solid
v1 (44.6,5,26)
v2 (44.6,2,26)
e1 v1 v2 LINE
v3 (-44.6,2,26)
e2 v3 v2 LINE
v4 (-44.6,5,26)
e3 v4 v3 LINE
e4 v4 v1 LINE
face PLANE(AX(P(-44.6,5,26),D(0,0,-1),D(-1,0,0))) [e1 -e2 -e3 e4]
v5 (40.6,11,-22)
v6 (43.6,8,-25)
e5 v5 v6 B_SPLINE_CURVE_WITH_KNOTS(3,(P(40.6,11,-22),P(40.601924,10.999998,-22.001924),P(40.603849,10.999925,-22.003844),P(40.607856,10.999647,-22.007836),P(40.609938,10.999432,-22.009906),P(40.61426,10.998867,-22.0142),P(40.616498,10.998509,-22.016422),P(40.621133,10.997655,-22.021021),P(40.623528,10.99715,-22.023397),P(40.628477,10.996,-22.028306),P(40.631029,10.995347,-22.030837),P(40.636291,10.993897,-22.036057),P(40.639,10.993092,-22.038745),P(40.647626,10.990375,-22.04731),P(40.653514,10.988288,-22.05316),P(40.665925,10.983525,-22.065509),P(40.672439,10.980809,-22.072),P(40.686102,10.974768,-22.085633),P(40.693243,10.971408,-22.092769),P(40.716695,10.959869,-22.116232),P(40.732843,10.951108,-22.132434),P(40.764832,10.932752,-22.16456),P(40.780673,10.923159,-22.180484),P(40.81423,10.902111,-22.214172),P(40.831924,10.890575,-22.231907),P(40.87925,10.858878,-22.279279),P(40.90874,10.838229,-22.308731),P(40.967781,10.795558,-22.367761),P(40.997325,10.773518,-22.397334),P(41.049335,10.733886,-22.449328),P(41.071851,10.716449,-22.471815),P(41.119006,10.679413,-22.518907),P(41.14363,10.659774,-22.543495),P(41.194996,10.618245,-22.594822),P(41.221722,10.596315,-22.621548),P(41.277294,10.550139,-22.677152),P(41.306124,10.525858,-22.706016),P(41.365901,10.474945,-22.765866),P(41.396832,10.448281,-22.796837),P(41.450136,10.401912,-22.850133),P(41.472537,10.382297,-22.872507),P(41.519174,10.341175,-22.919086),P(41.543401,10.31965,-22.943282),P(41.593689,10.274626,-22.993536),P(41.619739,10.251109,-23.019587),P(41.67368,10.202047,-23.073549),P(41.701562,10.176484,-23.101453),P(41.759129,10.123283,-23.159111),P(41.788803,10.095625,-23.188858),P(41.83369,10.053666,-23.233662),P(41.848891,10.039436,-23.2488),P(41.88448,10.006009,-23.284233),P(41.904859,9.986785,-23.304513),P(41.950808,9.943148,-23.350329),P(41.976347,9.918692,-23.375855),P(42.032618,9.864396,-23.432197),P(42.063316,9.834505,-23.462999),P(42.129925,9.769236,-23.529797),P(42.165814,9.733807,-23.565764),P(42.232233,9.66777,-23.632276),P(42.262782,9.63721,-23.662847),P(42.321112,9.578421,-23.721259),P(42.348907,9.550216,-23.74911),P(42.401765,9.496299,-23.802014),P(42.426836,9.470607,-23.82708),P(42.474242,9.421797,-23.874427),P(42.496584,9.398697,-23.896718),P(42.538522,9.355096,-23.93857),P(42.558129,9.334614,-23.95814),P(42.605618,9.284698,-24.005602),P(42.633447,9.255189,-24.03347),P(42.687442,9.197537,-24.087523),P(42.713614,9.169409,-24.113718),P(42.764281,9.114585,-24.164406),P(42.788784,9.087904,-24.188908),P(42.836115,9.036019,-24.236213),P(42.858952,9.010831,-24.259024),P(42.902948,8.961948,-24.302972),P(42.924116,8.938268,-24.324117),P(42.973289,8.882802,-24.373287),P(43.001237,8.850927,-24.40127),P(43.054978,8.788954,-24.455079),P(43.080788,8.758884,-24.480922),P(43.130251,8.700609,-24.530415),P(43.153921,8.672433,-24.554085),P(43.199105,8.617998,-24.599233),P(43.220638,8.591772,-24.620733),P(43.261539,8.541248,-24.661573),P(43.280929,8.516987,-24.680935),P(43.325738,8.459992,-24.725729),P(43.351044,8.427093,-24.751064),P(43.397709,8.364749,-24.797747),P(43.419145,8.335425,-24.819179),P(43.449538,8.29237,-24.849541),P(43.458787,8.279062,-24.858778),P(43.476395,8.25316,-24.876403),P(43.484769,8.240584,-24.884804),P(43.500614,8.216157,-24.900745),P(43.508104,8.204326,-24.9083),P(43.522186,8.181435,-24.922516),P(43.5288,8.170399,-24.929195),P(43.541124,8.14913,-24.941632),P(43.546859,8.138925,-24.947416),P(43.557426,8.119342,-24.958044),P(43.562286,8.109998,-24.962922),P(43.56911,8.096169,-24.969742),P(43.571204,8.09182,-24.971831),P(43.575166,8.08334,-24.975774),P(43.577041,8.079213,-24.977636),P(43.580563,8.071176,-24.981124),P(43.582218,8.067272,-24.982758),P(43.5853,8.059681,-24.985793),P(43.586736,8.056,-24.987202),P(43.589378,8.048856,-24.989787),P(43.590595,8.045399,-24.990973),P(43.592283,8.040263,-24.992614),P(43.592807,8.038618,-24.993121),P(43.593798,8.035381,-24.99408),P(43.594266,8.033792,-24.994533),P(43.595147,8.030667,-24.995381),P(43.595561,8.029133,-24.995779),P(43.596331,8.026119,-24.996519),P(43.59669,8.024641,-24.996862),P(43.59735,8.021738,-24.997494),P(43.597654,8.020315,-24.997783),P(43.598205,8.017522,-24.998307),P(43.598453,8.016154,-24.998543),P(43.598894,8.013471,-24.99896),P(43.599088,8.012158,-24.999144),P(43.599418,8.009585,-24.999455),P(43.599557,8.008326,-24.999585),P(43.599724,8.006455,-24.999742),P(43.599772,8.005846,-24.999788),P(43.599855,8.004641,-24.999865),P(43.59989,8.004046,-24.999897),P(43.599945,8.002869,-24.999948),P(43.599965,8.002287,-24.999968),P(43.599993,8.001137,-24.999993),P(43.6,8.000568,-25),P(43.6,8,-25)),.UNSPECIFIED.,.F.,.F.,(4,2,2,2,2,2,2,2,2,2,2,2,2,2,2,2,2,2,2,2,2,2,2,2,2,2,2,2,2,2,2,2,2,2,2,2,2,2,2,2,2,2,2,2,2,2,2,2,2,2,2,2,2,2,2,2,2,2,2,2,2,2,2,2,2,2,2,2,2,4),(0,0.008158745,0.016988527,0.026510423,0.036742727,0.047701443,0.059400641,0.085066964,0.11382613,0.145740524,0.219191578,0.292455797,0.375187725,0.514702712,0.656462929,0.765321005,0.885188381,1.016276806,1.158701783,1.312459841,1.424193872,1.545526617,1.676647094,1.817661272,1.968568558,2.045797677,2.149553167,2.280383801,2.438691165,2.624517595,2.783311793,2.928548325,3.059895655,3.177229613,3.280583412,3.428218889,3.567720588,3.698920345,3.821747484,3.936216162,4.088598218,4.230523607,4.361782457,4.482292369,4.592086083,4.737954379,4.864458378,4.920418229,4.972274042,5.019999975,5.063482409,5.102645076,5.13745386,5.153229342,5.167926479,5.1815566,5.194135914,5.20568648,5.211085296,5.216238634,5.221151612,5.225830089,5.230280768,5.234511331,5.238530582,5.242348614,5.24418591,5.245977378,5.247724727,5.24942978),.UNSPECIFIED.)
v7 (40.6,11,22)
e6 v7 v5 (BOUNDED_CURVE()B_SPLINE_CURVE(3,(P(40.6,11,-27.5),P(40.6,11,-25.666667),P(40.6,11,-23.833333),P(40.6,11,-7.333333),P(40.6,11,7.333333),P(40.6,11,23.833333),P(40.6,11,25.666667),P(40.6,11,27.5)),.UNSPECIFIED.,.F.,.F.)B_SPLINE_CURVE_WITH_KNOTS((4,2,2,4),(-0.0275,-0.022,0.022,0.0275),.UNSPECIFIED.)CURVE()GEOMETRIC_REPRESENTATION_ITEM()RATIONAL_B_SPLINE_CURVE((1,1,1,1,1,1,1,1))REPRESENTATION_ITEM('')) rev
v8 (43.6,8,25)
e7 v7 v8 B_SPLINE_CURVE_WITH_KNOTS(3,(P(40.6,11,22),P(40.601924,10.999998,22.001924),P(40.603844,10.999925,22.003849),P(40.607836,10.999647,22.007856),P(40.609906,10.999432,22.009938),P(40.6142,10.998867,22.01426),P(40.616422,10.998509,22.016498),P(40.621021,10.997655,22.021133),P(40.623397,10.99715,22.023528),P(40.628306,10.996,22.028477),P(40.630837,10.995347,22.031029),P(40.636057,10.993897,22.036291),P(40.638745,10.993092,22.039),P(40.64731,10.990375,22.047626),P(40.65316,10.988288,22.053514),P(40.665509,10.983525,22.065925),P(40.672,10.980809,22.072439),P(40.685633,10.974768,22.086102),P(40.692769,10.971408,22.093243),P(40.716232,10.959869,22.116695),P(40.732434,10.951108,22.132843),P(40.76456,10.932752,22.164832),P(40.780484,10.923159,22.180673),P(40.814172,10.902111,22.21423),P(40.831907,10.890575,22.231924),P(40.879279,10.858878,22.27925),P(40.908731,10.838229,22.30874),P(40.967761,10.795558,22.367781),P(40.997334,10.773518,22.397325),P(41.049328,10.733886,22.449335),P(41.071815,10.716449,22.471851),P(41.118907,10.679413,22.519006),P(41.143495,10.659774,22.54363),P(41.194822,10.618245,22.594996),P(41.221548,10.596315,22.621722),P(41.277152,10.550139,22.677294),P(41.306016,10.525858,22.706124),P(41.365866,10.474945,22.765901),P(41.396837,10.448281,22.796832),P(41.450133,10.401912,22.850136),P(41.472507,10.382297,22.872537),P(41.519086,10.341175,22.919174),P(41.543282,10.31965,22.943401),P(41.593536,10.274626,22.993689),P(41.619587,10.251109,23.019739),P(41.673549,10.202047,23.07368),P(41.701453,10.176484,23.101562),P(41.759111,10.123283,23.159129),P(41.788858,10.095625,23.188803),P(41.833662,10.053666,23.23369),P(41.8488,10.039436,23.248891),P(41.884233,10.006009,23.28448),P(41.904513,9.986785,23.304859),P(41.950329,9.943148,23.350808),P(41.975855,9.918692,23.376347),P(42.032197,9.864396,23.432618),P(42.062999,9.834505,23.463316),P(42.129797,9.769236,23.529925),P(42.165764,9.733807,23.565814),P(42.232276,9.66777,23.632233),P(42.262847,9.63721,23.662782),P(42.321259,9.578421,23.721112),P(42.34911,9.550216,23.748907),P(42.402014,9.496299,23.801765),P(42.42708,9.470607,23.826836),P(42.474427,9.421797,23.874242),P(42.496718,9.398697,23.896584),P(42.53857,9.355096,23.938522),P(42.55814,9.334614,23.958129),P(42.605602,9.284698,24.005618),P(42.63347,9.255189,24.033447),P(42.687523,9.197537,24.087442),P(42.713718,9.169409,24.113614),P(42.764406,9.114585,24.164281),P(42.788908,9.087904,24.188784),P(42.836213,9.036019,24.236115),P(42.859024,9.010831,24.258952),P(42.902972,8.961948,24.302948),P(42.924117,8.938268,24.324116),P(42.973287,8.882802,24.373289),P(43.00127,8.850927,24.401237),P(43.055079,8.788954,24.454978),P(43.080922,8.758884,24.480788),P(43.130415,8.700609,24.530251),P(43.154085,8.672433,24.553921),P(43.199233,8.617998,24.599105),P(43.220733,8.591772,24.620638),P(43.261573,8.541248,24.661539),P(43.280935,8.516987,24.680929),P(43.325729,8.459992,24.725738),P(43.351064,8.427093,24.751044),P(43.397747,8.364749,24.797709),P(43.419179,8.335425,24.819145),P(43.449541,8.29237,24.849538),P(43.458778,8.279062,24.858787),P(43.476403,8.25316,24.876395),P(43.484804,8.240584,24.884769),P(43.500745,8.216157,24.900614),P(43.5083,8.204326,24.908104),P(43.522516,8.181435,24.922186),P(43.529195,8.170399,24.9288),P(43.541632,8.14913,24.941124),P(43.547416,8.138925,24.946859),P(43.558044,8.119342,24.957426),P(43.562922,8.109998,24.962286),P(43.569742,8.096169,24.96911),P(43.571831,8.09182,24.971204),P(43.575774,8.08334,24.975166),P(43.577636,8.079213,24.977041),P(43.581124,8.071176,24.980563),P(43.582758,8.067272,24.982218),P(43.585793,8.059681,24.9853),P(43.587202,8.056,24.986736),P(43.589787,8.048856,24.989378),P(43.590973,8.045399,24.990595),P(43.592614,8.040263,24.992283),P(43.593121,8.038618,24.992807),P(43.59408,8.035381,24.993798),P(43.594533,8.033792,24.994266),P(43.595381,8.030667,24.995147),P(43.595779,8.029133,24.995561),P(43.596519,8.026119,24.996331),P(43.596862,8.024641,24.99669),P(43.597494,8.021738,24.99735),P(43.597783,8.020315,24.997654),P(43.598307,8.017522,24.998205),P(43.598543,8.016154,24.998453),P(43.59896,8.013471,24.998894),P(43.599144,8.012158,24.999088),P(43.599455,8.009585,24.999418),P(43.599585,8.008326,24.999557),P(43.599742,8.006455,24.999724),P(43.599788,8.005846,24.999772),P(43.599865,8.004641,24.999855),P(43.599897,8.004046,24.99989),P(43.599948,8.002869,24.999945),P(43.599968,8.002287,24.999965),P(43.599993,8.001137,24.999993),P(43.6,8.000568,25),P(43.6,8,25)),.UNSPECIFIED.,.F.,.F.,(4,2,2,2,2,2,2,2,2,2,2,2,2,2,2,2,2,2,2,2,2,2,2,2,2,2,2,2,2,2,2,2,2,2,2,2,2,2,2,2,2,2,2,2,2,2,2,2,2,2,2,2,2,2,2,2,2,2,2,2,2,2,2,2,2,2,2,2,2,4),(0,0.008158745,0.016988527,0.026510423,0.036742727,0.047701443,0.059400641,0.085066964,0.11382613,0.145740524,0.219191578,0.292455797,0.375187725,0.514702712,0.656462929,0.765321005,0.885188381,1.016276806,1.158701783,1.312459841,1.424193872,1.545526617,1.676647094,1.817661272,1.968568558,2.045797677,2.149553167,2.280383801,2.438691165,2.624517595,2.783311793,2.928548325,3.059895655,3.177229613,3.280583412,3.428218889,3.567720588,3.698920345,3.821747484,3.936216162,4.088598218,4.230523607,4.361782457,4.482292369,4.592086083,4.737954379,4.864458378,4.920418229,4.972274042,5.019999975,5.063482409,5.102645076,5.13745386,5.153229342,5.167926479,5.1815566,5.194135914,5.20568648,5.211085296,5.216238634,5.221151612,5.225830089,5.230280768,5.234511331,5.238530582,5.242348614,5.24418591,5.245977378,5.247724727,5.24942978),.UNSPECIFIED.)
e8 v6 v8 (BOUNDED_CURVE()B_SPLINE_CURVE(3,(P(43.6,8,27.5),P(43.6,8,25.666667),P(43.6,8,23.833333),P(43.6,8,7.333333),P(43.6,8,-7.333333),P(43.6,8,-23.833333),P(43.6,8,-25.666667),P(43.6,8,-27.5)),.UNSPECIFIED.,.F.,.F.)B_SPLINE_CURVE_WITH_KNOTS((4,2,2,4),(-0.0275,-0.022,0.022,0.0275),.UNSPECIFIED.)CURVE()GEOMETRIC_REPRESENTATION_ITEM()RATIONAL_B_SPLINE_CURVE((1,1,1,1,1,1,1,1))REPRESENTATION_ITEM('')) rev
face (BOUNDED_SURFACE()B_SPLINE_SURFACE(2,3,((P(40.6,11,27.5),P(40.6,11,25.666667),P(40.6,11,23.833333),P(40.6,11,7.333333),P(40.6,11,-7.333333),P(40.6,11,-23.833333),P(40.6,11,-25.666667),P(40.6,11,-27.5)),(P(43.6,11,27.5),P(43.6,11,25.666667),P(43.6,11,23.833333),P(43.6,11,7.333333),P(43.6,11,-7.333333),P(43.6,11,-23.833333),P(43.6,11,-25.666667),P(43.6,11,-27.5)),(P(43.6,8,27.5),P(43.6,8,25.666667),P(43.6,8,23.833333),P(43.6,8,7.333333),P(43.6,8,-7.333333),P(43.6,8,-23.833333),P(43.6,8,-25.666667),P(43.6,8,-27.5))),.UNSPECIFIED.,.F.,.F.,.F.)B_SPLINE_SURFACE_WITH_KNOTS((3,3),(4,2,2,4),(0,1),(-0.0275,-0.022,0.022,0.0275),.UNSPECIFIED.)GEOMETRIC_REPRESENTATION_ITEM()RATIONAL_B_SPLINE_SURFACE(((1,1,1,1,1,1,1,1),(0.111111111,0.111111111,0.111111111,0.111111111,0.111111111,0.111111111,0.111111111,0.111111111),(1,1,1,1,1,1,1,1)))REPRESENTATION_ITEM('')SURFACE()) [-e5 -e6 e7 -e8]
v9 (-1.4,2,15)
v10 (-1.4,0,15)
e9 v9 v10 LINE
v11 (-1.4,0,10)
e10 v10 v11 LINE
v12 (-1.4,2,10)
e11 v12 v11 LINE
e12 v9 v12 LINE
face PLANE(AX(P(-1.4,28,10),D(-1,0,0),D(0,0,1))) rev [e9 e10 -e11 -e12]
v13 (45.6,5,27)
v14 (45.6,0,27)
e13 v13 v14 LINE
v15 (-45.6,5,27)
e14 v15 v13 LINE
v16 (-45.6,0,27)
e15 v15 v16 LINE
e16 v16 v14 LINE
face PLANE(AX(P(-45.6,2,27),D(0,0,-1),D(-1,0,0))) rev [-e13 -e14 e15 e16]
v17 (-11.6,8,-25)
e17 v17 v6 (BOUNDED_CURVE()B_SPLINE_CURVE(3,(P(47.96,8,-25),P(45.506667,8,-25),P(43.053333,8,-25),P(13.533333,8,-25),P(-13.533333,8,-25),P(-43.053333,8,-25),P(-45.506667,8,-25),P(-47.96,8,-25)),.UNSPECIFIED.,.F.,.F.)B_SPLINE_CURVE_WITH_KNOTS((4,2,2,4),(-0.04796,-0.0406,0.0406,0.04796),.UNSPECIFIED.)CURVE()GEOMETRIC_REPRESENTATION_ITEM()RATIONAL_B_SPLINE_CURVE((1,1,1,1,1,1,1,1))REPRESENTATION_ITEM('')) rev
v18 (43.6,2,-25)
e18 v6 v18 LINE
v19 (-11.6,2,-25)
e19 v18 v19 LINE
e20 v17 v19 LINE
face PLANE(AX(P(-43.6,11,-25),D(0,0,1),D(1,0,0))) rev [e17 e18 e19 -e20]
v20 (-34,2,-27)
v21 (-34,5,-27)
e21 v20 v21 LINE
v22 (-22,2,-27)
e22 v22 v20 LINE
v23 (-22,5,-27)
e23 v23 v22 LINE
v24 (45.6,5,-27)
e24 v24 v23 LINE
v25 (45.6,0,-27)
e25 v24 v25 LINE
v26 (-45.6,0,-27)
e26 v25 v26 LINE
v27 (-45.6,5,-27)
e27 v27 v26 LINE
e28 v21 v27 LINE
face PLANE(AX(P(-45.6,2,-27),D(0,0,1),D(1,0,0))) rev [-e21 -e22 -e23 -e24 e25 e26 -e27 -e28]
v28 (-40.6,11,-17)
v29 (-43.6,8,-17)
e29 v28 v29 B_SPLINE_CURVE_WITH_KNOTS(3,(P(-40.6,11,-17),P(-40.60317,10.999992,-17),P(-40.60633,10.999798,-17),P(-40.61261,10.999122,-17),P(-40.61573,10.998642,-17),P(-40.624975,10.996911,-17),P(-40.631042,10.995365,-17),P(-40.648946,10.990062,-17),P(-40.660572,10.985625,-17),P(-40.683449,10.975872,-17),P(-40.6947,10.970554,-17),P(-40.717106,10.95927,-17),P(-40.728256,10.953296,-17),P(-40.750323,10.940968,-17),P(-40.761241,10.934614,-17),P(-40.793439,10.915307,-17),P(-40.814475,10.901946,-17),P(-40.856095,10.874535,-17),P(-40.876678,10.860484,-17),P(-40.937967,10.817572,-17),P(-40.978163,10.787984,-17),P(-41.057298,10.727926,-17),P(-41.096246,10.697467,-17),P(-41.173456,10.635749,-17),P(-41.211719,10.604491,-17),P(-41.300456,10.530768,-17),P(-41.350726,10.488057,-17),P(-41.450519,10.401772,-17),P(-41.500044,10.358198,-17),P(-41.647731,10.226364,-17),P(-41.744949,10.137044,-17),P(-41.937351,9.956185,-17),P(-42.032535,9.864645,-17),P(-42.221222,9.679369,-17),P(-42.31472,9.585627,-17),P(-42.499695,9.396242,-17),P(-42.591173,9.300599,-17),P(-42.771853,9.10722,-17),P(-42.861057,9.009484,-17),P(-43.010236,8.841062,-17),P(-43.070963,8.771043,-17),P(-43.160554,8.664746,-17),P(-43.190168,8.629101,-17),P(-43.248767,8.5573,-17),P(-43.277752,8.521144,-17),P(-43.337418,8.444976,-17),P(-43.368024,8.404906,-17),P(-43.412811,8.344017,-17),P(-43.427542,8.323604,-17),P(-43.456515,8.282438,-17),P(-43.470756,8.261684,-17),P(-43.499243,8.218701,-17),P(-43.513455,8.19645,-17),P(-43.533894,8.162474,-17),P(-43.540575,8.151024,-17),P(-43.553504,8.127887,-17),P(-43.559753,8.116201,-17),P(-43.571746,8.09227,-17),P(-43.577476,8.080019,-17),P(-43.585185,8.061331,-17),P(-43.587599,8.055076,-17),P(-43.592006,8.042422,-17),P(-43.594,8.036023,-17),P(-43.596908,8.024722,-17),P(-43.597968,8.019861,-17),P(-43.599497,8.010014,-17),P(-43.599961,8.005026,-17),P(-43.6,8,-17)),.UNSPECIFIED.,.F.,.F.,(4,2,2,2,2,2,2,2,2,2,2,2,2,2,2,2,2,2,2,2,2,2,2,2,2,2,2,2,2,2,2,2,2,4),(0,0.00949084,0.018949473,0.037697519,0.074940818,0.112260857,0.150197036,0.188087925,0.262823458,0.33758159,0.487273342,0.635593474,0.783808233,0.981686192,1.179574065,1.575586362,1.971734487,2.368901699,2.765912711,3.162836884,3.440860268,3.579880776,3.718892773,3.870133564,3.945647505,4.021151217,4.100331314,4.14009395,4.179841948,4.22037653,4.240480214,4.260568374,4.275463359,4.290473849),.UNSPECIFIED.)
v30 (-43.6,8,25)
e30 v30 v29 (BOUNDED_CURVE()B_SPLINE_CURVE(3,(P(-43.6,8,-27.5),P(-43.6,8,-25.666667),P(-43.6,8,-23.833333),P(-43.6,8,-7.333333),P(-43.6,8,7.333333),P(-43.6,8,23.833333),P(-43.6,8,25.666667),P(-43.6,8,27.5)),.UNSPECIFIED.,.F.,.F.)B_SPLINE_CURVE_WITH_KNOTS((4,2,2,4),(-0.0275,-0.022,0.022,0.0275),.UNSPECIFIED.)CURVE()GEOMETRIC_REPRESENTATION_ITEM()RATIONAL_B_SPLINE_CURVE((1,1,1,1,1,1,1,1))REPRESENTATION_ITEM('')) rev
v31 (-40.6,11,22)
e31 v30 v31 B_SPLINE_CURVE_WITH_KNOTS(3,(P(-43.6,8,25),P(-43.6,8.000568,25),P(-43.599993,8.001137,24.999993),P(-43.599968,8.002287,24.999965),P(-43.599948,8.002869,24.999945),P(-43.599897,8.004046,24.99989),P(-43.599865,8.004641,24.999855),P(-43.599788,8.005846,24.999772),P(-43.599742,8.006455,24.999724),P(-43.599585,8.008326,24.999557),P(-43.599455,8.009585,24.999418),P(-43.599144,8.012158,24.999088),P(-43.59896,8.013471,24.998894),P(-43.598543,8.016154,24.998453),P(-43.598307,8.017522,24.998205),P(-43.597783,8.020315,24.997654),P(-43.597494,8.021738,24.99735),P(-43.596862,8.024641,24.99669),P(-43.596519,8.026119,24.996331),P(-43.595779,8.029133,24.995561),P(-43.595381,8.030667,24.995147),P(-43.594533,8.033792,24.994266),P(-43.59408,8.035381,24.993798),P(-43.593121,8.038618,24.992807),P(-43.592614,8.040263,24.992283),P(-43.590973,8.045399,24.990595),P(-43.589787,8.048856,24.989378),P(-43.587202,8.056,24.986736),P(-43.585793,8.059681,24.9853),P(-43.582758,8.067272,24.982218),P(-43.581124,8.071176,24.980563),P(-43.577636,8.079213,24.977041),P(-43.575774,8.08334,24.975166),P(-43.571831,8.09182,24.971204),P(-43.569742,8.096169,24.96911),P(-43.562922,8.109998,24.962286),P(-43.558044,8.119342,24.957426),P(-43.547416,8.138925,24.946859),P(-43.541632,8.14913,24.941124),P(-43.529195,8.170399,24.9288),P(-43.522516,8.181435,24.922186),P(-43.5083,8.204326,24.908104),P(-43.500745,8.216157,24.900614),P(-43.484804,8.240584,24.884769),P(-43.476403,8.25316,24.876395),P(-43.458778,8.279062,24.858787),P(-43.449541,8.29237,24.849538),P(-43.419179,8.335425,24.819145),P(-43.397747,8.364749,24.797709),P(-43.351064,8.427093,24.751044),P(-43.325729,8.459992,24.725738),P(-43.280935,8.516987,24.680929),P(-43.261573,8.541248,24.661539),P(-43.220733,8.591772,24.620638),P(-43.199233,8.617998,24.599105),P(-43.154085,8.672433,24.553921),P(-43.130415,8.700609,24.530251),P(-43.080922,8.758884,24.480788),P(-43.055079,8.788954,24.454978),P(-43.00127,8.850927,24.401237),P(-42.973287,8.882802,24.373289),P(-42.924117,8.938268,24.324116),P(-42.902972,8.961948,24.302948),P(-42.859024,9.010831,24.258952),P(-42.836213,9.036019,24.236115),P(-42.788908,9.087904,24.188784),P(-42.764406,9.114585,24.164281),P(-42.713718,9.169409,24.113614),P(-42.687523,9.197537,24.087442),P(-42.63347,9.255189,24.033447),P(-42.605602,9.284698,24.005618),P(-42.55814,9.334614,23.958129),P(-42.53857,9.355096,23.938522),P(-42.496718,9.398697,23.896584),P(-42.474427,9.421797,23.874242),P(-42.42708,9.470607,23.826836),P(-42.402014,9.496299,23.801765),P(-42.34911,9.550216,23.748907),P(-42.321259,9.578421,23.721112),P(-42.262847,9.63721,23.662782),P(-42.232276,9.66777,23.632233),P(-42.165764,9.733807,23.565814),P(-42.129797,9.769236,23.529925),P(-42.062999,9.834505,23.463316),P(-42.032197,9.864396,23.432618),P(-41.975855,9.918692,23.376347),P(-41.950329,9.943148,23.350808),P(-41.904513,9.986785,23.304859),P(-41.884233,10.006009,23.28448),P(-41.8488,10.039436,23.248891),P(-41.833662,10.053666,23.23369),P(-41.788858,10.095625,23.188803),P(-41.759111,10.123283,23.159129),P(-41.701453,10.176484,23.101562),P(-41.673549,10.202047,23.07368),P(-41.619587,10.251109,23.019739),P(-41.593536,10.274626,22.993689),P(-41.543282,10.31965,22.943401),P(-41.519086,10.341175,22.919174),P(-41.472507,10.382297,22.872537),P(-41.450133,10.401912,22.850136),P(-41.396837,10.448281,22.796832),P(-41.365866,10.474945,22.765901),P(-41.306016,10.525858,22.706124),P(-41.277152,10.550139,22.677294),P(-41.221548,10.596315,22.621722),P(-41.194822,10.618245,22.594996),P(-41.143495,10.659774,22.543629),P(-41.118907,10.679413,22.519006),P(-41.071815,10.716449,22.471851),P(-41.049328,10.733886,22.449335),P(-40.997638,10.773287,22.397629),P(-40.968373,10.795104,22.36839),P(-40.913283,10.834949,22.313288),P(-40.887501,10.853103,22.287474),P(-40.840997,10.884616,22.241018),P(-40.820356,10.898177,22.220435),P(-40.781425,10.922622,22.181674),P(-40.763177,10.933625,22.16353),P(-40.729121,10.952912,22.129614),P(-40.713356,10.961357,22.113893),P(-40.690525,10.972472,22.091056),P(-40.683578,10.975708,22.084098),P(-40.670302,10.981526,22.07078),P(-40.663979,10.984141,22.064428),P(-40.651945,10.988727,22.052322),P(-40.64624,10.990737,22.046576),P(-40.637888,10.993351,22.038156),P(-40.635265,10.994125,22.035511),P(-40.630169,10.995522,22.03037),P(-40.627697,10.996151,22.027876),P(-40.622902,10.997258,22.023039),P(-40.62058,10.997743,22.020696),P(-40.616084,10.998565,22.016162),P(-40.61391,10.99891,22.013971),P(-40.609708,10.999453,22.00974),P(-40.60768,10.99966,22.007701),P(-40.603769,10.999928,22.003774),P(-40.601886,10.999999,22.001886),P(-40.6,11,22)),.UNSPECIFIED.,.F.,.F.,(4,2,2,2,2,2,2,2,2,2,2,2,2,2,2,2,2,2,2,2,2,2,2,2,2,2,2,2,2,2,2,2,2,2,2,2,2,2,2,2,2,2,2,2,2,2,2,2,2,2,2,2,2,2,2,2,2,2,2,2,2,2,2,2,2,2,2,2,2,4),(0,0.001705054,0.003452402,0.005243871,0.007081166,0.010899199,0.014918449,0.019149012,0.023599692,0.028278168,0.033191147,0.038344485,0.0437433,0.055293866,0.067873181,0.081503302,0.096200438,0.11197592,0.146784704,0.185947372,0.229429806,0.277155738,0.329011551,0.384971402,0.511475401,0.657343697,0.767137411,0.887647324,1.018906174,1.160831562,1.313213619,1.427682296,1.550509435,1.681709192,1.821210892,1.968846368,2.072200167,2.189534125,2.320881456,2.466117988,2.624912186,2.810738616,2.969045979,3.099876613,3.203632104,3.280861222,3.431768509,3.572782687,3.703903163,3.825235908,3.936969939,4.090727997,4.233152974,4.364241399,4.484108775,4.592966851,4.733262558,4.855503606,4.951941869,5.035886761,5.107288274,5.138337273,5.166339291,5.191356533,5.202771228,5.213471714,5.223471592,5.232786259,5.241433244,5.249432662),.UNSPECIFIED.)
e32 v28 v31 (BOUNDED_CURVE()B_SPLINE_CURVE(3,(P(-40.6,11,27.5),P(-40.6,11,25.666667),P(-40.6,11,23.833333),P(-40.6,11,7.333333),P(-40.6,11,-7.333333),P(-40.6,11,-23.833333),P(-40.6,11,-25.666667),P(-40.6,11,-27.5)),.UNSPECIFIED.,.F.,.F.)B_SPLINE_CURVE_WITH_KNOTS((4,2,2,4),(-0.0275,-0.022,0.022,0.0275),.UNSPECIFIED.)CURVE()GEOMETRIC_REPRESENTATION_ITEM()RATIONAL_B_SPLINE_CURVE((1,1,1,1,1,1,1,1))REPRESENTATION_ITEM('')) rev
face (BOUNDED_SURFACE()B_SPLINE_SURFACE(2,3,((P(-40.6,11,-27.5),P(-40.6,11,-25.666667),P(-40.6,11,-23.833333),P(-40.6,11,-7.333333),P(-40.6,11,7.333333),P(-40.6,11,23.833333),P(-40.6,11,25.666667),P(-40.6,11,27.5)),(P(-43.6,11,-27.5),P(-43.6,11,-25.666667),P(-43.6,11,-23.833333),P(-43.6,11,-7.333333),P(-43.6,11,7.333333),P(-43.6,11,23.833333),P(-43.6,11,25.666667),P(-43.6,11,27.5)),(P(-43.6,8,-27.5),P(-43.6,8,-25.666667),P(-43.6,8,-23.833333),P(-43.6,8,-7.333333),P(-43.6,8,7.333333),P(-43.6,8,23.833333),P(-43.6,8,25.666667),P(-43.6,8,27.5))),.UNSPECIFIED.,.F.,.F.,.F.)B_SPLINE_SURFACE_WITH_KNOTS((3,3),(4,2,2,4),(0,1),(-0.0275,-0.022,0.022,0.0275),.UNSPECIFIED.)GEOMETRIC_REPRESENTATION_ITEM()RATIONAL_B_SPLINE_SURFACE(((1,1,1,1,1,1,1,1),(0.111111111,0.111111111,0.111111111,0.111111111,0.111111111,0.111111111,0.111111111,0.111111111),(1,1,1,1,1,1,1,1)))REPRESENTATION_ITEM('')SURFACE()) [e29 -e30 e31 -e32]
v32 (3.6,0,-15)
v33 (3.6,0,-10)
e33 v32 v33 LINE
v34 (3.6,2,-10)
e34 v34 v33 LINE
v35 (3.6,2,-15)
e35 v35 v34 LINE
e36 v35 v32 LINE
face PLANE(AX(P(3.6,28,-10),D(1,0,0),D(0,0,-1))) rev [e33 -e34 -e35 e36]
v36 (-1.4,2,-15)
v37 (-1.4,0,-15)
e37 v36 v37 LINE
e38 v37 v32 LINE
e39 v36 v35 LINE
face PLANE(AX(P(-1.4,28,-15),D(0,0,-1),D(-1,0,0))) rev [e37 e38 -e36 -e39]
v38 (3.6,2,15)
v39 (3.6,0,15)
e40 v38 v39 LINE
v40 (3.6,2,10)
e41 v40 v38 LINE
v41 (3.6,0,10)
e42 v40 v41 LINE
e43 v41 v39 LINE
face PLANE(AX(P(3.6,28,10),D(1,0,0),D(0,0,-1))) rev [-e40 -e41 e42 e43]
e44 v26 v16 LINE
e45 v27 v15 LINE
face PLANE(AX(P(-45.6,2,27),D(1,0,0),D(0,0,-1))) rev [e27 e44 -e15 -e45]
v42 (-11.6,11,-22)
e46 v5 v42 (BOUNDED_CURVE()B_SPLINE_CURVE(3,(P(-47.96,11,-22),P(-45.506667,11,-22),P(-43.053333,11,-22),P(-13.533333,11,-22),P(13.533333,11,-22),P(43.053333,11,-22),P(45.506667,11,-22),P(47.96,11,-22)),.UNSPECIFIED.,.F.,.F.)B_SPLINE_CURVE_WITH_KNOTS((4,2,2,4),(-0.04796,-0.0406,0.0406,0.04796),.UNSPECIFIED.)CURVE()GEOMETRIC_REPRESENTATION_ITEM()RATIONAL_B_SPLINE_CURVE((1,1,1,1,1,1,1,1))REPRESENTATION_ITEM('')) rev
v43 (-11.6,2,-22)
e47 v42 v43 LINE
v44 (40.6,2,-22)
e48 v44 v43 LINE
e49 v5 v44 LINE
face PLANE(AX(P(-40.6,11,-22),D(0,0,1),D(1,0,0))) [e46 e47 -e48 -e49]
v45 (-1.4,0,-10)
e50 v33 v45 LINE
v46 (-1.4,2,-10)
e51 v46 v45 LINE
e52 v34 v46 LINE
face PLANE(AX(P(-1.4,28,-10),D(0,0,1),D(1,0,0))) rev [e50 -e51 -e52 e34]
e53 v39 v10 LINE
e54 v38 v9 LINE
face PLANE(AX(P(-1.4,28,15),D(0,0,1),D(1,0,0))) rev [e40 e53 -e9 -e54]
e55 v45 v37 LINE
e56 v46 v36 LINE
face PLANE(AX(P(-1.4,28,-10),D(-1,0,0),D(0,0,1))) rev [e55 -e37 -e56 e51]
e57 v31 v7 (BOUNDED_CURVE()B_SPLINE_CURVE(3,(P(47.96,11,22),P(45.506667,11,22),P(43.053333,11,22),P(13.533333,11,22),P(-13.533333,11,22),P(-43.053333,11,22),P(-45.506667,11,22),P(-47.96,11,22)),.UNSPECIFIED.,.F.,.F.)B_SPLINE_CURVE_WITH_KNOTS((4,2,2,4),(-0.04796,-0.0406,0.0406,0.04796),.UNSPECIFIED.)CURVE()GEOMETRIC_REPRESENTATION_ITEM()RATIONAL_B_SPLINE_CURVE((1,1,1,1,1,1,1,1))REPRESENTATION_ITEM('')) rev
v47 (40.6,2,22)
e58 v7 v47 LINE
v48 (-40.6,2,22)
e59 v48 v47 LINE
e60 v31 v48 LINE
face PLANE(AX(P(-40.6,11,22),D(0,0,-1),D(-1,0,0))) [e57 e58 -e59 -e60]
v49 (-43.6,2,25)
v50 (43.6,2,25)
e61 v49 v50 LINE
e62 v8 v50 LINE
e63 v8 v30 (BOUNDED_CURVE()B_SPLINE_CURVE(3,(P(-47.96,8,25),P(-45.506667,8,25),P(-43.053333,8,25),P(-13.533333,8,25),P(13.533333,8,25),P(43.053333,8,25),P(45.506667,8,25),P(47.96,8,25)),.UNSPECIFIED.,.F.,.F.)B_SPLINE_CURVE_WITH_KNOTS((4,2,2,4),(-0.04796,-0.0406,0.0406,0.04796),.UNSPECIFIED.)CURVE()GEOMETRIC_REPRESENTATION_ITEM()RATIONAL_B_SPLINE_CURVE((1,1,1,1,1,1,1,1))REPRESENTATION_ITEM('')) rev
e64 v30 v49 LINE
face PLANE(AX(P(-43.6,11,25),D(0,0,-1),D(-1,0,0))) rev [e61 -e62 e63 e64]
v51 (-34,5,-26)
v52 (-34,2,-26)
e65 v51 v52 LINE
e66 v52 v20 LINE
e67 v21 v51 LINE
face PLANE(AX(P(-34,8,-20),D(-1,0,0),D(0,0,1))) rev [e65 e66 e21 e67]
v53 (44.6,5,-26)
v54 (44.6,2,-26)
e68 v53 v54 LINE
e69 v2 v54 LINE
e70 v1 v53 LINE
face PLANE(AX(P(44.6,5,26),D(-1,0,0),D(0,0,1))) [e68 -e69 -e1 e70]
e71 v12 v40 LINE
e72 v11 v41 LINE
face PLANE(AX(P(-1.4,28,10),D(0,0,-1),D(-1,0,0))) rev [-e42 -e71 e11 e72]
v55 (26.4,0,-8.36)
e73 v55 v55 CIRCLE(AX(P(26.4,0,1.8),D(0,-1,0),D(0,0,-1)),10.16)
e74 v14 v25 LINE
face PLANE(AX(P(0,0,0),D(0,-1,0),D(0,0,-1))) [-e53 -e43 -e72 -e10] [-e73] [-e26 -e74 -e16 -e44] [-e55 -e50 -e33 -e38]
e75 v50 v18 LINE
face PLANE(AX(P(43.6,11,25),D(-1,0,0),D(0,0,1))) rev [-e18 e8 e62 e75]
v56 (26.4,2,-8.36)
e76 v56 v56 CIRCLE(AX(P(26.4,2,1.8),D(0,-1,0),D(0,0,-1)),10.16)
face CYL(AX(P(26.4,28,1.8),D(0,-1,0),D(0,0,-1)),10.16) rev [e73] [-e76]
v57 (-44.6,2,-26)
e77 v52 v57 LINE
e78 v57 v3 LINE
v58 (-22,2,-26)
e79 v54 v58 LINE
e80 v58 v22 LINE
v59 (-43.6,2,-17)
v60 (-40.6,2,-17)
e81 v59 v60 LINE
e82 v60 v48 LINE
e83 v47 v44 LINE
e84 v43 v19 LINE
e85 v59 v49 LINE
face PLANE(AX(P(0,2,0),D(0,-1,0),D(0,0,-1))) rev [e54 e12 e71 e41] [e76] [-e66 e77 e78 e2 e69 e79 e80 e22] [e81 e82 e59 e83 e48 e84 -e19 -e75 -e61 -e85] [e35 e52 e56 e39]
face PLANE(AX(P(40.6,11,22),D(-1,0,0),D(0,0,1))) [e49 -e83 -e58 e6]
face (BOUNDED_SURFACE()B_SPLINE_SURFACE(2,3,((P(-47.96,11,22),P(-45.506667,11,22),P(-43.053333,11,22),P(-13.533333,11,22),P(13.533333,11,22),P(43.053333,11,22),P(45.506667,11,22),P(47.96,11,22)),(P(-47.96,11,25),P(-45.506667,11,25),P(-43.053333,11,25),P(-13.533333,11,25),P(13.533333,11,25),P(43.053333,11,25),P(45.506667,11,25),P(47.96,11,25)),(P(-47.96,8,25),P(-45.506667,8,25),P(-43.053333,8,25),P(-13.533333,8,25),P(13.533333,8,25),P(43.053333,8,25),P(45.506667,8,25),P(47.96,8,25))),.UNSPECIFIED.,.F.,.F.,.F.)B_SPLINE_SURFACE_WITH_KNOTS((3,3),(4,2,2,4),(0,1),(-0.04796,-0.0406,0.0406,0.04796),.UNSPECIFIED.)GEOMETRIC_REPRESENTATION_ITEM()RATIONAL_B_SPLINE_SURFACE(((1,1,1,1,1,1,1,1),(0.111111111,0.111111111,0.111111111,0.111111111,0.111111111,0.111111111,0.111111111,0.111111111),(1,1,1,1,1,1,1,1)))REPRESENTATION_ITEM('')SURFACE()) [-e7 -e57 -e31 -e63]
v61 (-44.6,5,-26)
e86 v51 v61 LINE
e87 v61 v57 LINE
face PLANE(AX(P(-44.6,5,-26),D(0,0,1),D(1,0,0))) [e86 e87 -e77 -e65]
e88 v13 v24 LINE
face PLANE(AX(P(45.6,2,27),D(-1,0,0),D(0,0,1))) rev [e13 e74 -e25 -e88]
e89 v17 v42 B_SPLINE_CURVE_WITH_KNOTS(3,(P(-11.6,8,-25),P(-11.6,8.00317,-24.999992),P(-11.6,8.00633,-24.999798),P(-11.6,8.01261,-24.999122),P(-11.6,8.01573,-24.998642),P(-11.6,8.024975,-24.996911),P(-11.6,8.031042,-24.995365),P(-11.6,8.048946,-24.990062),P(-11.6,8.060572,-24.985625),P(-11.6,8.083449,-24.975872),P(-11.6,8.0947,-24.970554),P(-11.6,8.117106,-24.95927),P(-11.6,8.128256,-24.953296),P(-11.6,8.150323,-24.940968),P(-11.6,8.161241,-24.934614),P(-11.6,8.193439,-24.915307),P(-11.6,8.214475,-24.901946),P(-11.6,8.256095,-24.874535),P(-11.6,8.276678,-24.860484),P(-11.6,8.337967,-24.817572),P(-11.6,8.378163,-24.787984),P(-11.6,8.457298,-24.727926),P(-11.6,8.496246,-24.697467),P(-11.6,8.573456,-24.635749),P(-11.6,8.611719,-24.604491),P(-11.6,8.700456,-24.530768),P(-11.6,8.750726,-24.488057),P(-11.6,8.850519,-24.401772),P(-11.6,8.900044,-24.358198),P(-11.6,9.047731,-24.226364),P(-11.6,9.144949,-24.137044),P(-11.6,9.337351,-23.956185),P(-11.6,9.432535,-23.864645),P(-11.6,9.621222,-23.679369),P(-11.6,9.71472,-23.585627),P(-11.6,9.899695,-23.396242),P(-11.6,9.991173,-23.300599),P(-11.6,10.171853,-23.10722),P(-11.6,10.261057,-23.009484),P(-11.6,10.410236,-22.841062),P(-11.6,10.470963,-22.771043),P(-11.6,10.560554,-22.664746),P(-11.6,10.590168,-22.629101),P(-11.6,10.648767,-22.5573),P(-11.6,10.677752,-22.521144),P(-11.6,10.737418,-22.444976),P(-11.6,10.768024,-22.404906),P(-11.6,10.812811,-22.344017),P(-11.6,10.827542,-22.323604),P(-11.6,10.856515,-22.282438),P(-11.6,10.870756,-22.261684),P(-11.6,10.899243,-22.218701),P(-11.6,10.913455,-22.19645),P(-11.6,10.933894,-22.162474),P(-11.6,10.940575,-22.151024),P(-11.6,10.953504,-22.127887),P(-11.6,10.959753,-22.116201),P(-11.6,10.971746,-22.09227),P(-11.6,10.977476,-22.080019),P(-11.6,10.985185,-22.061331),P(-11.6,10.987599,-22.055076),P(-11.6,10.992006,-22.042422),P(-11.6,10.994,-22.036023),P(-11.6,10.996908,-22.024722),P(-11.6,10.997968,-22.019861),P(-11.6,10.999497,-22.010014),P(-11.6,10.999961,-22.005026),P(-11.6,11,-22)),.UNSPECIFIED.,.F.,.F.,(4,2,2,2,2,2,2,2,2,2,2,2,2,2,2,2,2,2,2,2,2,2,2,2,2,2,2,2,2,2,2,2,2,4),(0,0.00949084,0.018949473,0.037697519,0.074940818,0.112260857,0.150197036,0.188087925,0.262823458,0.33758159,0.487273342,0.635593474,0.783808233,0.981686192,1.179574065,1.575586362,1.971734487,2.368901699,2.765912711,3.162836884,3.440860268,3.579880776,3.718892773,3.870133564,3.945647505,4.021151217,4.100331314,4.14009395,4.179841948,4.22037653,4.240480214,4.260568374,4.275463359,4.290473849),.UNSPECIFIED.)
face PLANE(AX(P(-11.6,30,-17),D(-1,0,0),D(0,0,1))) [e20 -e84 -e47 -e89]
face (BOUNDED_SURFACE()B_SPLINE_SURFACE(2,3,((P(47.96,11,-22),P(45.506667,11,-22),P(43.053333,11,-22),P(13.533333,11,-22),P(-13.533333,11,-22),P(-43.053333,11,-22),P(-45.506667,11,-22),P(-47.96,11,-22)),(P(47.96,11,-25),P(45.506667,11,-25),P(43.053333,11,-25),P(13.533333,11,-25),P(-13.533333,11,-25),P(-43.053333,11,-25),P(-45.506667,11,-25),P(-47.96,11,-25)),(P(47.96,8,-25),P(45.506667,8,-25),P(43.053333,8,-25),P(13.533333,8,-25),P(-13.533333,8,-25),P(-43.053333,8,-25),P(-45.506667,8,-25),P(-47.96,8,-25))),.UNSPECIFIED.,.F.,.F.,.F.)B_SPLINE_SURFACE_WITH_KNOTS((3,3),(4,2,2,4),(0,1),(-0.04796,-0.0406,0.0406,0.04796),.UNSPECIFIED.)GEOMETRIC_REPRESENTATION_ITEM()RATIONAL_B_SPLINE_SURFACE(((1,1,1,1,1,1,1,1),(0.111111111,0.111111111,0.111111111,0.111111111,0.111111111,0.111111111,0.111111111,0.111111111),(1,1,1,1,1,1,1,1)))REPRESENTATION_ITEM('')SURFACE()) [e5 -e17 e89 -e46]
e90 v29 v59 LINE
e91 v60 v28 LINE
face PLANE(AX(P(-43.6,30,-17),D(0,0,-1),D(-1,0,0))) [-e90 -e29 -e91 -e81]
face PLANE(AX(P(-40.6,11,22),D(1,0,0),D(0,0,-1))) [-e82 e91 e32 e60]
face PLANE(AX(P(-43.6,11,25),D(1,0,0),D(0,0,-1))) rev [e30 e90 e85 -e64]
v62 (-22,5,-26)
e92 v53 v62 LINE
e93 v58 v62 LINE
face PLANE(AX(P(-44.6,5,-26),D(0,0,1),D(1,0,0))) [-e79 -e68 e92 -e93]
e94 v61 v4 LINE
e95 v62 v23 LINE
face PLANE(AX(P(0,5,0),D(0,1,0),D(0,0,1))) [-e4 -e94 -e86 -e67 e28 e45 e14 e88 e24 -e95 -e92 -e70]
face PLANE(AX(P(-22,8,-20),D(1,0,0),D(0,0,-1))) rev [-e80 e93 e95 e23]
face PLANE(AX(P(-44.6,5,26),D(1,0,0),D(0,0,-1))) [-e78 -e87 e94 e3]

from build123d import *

# Parameters (mm, degrees)
CROQUIS1_W              = 91.2
CROQUIS1_H              = 54
SALIENTE_EXTRUIR1_DEPTH = 2
CROQUIS2_W              = 91.2
CROQUIS2_H              = 54
CROQUIS2_W_2            = 89.2
CROQUIS2_H_2            = 52
SALIENTE_EXTRUIR2_DEPTH = 3
CROQUIS3_W              = 87.2
CROQUIS3_H              = 50
CROQUIS3_W_2            = 81.2
CROQUIS3_H_2            = 44
SALIENTE_EXTRUIR3_DEPTH = 9
REDONDEO1_SIZE          = 3
CROQUIS4_W              = 32
CROQUIS4_H              = 8
CORTAR_EXTRUIR2_DEPTH   = 28
CROQUIS5_R              = 10.16
CROQUIS5_W              = 5
CROQUIS5_H              = 5
CORTAR_EXTRUIR3_DEPTH   = 28
CROQUIS6_W              = 12
CROQUIS6_H              = 6
CORTAR_EXTRUIR4_DEPTH   = 7


with BuildPart() as part:
    # Croquis1 → Saliente-Extruir1 (new body)
    with BuildSketch(Plane(origin=(0, 0, 0), x_dir=(1, 0, 0), z_dir=(0, 1, 0))):
        Rectangle(CROQUIS1_W, CROQUIS1_H)
    extrude(amount=SALIENTE_EXTRUIR1_DEPTH)

    # Croquis2 → Saliente-Extruir2 (add)
    with BuildSketch(Plane(origin=(0, 2, 0), x_dir=(1, 0, 0), z_dir=(0, 1, 0))):
        Rectangle(CROQUIS2_W, CROQUIS2_H)
        Rectangle(CROQUIS2_W_2, CROQUIS2_H_2, mode=Mode.SUBTRACT)
    extrude(amount=SALIENTE_EXTRUIR2_DEPTH)

    # Croquis3 → Saliente-Extruir3 (add)
    with BuildSketch(Plane(origin=(0, 2, 0), x_dir=(1, 0, 0), z_dir=(0, 1, 0))):
        Rectangle(CROQUIS3_W, CROQUIS3_H)
        Rectangle(CROQUIS3_W_2, CROQUIS3_H_2, mode=Mode.SUBTRACT)
    extrude(amount=SALIENTE_EXTRUIR3_DEPTH)

    # Redondeo1
    # a fillet whose section is not a circle: 3 mm, written as the material it takes off along each edge
    with BuildSketch(Plane(origin=(51.1, 11, -25), x_dir=(0, -1, 0), z_dir=(-1, 0, 0)), Plane(origin=(-51.1, 11, 25), x_dir=(0, -1, 0), z_dir=(1, 0, 0))) as redondeo1_piece_1:
        with BuildLine():
            Bezier((REDONDEO1_SIZE, 0), (0, 0), (0, REDONDEO1_SIZE), weights=[1, 0.111111111, 1])
            Line((0, REDONDEO1_SIZE), (0, 0))
            Line((0, 0), (REDONDEO1_SIZE, 0))
        make_face()
    extrude(amount=102.2, mode=Mode.SUBTRACT)
    with BuildSketch(Plane(origin=(43.6, 11, 32.5), x_dir=(0, -1, 0), z_dir=(0, 0, -1)), Plane(origin=(-43.6, 11, -32.5), x_dir=(0, -1, 0), z_dir=(0, 0, 1))) as redondeo1_piece_2:
        with BuildLine():
            Bezier((REDONDEO1_SIZE, 0), (0, 0), (0, REDONDEO1_SIZE), weights=[1, 0.111111111, 1])
            Line((0, REDONDEO1_SIZE), (0, 0))
            Line((0, 0), (REDONDEO1_SIZE, 0))
        make_face()
    extrude(amount=65, mode=Mode.SUBTRACT)

    # Croquis4 → Cortar-Extruir2 (cut)
    with BuildSketch(Plane(origin=(0, 2, 0), x_dir=(1, 0, 0), z_dir=(0, 1, 0))):
        with Locations((-27.6, 21)):
            Rectangle(CROQUIS4_W, CROQUIS4_H)
    extrude(amount=CORTAR_EXTRUIR2_DEPTH, mode=Mode.SUBTRACT)

    # Croquis5 → Cortar-Extruir3 (cut)
    with BuildSketch(Plane.XZ):
        with Locations(Location((26.4, 1.8, 0), (0, 0, 270))):
            Circle(CROQUIS5_R)
        with Locations((1.1, 12.5)):
            Rectangle(CROQUIS5_W, CROQUIS5_H)
        with Locations((1.1, -12.5)):
            Rectangle(CROQUIS5_W, CROQUIS5_H)
    extrude(amount=-CORTAR_EXTRUIR3_DEPTH, mode=Mode.SUBTRACT)

    # Croquis6 → Cortar-Extruir4 (cut)
    with BuildSketch(Plane(origin=(0, 0, -27), x_dir=(-1, 0, 0), z_dir=(0, 0, -1))):
        with Locations((28, 5)):
            Rectangle(CROQUIS6_W, CROQUIS6_H)
    extrude(amount=-CORTAR_EXTRUIR4_DEPTH, mode=Mode.SUBTRACT)


solid = part.part
